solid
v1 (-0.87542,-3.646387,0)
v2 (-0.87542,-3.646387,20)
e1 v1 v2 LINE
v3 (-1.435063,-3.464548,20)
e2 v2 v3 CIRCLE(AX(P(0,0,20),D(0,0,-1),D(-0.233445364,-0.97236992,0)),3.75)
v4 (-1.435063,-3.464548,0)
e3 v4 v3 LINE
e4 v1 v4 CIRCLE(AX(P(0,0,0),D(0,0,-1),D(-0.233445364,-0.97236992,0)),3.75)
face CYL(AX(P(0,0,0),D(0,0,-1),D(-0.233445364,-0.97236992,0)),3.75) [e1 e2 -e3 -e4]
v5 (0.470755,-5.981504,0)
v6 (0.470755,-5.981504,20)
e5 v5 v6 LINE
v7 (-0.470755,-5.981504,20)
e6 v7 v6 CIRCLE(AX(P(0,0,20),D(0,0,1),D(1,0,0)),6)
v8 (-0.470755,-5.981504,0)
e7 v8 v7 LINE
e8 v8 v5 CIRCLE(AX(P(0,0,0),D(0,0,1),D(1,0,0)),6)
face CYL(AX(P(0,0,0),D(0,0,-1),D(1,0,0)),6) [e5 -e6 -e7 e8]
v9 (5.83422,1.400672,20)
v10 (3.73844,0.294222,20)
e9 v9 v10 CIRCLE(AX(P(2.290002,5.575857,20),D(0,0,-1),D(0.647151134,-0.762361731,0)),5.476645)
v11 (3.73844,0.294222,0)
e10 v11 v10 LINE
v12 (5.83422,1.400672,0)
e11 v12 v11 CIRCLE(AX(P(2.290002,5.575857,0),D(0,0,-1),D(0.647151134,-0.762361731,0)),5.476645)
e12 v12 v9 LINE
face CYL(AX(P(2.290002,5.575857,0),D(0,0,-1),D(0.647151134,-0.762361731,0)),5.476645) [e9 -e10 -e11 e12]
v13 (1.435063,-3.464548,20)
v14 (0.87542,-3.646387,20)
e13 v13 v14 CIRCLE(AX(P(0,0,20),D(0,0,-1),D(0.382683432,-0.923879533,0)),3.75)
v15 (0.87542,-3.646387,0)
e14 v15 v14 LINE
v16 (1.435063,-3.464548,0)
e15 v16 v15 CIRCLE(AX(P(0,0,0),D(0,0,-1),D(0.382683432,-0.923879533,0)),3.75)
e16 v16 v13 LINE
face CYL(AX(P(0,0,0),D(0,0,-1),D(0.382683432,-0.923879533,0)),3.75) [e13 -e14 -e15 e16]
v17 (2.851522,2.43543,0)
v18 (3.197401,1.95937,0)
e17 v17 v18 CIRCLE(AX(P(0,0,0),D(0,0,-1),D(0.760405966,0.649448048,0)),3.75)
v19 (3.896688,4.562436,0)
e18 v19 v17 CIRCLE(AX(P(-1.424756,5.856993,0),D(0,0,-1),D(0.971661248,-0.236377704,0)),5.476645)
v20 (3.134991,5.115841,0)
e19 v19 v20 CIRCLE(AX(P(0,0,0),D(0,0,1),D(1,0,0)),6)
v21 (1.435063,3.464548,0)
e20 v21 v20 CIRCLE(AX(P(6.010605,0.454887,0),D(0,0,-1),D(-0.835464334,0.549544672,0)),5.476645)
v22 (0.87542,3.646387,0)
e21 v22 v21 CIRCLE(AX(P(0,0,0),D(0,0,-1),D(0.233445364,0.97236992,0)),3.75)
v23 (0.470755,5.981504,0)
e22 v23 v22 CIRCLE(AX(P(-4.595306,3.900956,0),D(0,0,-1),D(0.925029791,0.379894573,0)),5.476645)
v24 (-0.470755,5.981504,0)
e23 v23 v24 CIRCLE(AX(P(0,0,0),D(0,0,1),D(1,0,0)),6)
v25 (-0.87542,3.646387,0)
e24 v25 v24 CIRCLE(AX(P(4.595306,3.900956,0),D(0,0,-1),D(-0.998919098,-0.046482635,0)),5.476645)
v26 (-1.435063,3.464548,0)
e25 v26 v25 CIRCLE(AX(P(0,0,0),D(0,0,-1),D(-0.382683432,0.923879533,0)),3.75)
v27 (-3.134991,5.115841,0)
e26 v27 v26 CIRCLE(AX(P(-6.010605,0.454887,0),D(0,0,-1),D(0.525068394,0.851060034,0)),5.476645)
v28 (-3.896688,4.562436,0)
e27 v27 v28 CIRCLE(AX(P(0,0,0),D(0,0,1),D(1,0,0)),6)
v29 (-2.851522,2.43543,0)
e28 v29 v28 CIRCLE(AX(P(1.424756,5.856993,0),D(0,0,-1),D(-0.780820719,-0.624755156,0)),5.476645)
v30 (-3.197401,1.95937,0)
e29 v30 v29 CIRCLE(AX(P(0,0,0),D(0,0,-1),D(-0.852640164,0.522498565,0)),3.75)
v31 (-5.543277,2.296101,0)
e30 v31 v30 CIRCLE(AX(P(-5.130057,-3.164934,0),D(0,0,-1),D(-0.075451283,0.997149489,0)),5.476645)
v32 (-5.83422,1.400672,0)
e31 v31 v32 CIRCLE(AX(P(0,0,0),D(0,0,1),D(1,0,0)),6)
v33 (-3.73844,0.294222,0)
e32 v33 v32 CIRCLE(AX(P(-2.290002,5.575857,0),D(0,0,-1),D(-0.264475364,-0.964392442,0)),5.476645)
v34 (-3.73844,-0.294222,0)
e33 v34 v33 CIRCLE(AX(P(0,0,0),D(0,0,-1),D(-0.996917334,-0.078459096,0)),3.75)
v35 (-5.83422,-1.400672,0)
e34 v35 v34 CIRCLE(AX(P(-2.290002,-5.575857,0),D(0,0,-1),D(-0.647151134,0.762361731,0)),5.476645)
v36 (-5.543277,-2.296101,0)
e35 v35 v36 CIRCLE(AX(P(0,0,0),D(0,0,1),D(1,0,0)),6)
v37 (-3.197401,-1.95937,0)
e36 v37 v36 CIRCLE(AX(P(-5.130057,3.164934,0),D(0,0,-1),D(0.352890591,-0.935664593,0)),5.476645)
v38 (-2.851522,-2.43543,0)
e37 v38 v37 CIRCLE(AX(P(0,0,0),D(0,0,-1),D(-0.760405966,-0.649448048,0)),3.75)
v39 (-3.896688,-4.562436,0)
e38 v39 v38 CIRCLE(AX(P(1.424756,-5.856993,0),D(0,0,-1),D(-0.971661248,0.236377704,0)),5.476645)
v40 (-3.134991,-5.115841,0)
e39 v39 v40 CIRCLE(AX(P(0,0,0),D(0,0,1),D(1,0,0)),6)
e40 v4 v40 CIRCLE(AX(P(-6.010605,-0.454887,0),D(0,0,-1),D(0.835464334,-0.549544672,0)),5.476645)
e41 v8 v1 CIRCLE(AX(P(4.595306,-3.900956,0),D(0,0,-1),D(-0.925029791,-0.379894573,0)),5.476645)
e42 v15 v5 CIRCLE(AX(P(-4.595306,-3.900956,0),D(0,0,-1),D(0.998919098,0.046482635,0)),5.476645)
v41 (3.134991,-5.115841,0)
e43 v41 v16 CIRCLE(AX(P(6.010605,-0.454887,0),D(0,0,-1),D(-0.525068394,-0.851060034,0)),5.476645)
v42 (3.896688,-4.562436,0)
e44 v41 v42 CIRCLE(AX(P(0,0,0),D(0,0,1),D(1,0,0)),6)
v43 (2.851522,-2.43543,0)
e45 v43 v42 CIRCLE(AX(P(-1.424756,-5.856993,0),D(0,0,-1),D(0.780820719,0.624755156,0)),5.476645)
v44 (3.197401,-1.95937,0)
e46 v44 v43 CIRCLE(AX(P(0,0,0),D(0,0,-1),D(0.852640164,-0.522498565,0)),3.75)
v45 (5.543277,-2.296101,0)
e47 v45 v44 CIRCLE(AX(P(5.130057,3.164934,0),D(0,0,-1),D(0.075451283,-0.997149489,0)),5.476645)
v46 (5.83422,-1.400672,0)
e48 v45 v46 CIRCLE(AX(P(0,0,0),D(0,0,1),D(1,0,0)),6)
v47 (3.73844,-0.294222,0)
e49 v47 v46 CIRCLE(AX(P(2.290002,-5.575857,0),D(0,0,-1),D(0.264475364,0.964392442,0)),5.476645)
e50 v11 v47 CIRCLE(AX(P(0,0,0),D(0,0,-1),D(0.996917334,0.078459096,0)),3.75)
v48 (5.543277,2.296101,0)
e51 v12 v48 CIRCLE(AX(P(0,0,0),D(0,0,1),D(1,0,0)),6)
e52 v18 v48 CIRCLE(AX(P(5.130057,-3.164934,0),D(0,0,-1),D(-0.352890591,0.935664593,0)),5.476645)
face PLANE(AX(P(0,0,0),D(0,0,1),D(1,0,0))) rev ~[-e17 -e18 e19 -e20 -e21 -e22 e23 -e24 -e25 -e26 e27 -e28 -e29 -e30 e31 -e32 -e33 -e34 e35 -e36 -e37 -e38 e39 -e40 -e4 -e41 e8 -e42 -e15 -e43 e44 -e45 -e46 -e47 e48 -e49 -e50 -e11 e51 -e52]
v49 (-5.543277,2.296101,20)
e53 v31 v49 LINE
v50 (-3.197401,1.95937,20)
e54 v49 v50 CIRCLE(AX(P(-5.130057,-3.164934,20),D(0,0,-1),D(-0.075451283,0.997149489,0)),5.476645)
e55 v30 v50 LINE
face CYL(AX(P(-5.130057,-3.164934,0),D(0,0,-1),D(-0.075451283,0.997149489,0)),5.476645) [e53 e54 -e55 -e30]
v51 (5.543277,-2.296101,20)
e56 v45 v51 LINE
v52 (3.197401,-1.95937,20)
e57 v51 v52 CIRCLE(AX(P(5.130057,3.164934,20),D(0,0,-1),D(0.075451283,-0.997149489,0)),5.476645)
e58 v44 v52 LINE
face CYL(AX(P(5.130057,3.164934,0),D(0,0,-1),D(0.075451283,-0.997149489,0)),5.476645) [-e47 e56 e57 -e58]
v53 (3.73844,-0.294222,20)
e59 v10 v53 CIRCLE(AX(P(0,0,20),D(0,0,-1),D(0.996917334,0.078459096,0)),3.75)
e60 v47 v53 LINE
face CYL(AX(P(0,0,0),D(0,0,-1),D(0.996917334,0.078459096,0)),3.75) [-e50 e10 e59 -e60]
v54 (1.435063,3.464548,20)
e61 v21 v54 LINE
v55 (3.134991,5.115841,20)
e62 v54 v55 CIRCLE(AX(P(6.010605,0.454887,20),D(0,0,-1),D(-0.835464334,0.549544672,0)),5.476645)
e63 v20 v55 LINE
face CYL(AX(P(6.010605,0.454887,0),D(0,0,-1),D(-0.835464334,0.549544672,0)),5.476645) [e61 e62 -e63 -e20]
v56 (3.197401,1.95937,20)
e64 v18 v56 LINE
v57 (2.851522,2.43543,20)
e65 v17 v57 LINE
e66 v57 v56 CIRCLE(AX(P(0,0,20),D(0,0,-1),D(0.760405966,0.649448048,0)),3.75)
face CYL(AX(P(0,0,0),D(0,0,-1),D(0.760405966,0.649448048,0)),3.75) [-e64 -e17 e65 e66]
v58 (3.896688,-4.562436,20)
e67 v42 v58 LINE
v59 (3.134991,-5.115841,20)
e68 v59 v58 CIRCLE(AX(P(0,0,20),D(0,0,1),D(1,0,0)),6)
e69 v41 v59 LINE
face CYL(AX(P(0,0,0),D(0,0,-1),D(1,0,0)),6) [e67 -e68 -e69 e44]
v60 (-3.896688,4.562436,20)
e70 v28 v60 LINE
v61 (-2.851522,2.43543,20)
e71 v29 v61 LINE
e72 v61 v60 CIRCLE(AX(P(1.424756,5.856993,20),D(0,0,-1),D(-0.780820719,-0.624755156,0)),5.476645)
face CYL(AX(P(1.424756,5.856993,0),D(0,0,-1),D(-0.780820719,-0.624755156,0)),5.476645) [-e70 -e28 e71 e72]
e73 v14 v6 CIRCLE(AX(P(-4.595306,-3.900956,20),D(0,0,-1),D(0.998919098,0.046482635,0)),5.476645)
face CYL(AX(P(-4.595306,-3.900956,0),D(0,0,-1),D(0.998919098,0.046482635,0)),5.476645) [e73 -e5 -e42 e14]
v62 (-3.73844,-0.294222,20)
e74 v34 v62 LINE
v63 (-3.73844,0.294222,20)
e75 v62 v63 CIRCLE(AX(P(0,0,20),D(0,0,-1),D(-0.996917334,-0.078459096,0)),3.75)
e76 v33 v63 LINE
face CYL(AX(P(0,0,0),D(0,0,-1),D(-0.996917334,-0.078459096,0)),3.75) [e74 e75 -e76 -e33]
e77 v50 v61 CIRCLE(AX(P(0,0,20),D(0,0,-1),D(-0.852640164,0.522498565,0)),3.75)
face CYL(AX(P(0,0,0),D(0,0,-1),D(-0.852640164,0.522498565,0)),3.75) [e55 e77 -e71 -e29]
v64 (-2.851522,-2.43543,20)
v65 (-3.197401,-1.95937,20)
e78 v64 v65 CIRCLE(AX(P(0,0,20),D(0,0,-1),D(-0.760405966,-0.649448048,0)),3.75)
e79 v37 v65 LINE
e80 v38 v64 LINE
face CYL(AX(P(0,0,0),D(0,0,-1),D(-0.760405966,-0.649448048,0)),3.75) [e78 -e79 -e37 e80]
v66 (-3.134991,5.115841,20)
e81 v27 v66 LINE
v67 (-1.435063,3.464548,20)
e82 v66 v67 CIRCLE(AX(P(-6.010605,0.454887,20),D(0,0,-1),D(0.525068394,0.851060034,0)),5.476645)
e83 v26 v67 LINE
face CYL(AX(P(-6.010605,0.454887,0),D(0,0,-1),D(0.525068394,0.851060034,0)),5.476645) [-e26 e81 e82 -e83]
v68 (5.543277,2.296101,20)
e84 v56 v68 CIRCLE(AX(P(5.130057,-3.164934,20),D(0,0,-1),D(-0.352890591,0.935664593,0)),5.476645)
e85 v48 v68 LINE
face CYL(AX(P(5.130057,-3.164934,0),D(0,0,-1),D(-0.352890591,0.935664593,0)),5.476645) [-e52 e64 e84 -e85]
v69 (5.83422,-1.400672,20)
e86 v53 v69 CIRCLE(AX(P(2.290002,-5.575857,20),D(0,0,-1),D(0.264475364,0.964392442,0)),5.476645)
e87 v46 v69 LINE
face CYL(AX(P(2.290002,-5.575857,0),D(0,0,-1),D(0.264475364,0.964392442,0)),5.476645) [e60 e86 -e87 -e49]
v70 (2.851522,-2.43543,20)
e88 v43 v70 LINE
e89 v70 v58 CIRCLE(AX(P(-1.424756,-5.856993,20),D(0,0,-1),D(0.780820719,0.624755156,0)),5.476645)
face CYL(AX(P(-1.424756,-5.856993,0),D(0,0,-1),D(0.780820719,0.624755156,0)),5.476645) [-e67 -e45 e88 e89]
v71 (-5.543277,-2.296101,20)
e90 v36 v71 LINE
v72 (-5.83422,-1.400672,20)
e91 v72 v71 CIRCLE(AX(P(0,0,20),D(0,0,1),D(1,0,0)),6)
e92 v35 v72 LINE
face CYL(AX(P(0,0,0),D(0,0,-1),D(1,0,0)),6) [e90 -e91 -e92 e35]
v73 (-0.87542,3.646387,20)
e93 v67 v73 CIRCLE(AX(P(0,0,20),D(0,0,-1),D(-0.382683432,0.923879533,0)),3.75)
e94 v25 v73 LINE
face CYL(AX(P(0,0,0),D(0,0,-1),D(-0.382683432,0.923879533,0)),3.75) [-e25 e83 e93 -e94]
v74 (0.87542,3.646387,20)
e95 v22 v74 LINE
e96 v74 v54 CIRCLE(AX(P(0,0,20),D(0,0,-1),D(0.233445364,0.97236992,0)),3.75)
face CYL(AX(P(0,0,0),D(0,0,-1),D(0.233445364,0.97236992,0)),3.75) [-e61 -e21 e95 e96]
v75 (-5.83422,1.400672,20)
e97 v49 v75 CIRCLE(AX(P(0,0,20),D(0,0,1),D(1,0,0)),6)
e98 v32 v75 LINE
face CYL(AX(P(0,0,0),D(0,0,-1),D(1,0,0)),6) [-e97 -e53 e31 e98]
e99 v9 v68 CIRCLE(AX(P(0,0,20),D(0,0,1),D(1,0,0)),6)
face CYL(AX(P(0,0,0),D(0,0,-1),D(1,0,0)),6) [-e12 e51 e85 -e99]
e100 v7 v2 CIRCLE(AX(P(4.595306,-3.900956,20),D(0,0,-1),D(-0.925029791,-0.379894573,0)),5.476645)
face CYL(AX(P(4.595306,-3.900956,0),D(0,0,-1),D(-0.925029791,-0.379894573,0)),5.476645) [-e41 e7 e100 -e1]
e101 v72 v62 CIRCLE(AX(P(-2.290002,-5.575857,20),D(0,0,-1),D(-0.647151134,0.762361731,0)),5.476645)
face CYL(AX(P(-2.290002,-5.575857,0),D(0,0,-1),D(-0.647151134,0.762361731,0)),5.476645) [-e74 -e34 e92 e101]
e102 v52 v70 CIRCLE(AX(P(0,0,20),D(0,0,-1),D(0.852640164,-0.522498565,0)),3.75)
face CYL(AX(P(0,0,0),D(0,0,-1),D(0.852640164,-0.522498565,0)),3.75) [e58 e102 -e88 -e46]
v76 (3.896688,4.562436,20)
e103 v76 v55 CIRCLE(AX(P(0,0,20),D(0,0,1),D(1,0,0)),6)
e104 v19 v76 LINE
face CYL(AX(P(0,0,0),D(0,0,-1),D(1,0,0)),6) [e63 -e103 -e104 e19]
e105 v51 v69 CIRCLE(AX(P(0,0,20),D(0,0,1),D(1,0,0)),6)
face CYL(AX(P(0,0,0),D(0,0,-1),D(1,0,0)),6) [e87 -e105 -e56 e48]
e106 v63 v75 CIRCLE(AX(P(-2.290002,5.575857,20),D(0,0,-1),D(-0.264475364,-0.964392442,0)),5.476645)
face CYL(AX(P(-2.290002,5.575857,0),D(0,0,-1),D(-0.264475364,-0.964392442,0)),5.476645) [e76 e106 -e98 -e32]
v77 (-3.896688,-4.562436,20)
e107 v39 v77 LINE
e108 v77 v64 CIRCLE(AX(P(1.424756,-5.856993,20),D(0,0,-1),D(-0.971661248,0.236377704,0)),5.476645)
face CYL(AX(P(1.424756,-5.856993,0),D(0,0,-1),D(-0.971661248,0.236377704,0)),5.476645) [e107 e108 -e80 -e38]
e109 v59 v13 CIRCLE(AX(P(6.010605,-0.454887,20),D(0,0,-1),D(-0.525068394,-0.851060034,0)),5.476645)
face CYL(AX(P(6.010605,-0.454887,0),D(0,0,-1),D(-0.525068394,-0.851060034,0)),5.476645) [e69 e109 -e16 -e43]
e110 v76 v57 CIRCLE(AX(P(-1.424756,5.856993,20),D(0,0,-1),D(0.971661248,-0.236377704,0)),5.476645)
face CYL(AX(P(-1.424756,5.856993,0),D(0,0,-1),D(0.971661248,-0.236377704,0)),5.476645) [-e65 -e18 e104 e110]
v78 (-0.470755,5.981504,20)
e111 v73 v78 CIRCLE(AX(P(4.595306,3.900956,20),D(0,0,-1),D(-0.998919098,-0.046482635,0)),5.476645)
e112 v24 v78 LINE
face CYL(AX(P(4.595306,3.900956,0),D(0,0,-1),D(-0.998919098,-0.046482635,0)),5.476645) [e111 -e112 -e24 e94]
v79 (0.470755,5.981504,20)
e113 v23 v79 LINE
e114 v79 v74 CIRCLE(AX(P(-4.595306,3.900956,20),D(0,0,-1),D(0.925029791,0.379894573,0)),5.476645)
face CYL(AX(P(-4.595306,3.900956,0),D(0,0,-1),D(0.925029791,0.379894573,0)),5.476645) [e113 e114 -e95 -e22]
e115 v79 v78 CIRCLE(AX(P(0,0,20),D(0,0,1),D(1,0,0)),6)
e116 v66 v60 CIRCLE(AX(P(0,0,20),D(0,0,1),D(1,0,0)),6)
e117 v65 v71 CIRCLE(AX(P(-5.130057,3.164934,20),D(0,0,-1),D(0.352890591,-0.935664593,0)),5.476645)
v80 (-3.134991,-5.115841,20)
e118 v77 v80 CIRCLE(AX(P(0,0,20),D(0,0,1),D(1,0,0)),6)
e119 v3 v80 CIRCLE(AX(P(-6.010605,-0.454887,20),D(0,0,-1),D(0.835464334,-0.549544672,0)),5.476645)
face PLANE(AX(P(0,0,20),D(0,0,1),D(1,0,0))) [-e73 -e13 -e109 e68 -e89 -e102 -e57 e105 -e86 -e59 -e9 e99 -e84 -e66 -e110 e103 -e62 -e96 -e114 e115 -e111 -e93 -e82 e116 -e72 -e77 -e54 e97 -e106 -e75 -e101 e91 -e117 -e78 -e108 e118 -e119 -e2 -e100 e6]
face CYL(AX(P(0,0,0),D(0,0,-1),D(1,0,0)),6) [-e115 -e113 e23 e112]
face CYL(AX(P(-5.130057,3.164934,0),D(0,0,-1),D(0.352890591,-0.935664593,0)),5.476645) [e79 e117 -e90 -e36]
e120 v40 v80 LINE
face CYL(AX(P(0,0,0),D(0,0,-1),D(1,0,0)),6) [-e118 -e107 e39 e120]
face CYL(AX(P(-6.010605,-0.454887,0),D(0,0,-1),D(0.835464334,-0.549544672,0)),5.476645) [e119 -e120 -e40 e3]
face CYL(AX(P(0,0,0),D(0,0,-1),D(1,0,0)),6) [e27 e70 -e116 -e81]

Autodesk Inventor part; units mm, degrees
sketch "Sketch1" plane through (0, 0, 0) normal (0, 0, 1) x (1, 0, 0)
  circle A0 centre (0, 0) radius 6
  dimension "d0" = 12
extrude "Extrusion1" add sketch "Sketch1" along normal blind 20
ref_plane "Work Plane2" through (0, 0, 10) normal (0, 0, 1) x (1, 0, 0)
sketch "Sketch2" plane through (0, 0, 0) normal (0, 0, -1) x (-1, 0, 0)
  circle A0 centre (0, 0) radius 6 projected
  circle A1 centre (0, 0) radius 5
  dimension "d3" = 10
surface extrude "Pitch Diameter" sketch "Sketch2" against normal through all shown no curves A1
ref_plane "Work Plane8" through (0, 0, 0) normal (0.9510565, 0.309017, 0) x (0, 0, 1)
ref_plane "Work Plane9" through (0, 0, 0) normal (1, 0, 0) x (0, 1, 0)
spur gear teeth "Spur Gear" teeth 10 pitch diameter 10 tip diameter 12 root diameter 7.5 face width 20 start plane through (0, 0, 0) normal (0, 0, -1) x (-1, 0, 0)
equation "\"d0\" = da_da"
equation "\"d1\" = da_b"
equation "\"d3\" = da_d"
equation "\"d16\" = da_aw"
equation "\"d43\" = da_aw"
equation "\"d46\" = da_aw"
equation "\"da_da\" = 12"
equation "\"da_b\" = 20"
equation "\"da_d\" = 10"
equation "\"da_aw\" = 7.5"
properties part number "Spur Gear1" material "Steel"
